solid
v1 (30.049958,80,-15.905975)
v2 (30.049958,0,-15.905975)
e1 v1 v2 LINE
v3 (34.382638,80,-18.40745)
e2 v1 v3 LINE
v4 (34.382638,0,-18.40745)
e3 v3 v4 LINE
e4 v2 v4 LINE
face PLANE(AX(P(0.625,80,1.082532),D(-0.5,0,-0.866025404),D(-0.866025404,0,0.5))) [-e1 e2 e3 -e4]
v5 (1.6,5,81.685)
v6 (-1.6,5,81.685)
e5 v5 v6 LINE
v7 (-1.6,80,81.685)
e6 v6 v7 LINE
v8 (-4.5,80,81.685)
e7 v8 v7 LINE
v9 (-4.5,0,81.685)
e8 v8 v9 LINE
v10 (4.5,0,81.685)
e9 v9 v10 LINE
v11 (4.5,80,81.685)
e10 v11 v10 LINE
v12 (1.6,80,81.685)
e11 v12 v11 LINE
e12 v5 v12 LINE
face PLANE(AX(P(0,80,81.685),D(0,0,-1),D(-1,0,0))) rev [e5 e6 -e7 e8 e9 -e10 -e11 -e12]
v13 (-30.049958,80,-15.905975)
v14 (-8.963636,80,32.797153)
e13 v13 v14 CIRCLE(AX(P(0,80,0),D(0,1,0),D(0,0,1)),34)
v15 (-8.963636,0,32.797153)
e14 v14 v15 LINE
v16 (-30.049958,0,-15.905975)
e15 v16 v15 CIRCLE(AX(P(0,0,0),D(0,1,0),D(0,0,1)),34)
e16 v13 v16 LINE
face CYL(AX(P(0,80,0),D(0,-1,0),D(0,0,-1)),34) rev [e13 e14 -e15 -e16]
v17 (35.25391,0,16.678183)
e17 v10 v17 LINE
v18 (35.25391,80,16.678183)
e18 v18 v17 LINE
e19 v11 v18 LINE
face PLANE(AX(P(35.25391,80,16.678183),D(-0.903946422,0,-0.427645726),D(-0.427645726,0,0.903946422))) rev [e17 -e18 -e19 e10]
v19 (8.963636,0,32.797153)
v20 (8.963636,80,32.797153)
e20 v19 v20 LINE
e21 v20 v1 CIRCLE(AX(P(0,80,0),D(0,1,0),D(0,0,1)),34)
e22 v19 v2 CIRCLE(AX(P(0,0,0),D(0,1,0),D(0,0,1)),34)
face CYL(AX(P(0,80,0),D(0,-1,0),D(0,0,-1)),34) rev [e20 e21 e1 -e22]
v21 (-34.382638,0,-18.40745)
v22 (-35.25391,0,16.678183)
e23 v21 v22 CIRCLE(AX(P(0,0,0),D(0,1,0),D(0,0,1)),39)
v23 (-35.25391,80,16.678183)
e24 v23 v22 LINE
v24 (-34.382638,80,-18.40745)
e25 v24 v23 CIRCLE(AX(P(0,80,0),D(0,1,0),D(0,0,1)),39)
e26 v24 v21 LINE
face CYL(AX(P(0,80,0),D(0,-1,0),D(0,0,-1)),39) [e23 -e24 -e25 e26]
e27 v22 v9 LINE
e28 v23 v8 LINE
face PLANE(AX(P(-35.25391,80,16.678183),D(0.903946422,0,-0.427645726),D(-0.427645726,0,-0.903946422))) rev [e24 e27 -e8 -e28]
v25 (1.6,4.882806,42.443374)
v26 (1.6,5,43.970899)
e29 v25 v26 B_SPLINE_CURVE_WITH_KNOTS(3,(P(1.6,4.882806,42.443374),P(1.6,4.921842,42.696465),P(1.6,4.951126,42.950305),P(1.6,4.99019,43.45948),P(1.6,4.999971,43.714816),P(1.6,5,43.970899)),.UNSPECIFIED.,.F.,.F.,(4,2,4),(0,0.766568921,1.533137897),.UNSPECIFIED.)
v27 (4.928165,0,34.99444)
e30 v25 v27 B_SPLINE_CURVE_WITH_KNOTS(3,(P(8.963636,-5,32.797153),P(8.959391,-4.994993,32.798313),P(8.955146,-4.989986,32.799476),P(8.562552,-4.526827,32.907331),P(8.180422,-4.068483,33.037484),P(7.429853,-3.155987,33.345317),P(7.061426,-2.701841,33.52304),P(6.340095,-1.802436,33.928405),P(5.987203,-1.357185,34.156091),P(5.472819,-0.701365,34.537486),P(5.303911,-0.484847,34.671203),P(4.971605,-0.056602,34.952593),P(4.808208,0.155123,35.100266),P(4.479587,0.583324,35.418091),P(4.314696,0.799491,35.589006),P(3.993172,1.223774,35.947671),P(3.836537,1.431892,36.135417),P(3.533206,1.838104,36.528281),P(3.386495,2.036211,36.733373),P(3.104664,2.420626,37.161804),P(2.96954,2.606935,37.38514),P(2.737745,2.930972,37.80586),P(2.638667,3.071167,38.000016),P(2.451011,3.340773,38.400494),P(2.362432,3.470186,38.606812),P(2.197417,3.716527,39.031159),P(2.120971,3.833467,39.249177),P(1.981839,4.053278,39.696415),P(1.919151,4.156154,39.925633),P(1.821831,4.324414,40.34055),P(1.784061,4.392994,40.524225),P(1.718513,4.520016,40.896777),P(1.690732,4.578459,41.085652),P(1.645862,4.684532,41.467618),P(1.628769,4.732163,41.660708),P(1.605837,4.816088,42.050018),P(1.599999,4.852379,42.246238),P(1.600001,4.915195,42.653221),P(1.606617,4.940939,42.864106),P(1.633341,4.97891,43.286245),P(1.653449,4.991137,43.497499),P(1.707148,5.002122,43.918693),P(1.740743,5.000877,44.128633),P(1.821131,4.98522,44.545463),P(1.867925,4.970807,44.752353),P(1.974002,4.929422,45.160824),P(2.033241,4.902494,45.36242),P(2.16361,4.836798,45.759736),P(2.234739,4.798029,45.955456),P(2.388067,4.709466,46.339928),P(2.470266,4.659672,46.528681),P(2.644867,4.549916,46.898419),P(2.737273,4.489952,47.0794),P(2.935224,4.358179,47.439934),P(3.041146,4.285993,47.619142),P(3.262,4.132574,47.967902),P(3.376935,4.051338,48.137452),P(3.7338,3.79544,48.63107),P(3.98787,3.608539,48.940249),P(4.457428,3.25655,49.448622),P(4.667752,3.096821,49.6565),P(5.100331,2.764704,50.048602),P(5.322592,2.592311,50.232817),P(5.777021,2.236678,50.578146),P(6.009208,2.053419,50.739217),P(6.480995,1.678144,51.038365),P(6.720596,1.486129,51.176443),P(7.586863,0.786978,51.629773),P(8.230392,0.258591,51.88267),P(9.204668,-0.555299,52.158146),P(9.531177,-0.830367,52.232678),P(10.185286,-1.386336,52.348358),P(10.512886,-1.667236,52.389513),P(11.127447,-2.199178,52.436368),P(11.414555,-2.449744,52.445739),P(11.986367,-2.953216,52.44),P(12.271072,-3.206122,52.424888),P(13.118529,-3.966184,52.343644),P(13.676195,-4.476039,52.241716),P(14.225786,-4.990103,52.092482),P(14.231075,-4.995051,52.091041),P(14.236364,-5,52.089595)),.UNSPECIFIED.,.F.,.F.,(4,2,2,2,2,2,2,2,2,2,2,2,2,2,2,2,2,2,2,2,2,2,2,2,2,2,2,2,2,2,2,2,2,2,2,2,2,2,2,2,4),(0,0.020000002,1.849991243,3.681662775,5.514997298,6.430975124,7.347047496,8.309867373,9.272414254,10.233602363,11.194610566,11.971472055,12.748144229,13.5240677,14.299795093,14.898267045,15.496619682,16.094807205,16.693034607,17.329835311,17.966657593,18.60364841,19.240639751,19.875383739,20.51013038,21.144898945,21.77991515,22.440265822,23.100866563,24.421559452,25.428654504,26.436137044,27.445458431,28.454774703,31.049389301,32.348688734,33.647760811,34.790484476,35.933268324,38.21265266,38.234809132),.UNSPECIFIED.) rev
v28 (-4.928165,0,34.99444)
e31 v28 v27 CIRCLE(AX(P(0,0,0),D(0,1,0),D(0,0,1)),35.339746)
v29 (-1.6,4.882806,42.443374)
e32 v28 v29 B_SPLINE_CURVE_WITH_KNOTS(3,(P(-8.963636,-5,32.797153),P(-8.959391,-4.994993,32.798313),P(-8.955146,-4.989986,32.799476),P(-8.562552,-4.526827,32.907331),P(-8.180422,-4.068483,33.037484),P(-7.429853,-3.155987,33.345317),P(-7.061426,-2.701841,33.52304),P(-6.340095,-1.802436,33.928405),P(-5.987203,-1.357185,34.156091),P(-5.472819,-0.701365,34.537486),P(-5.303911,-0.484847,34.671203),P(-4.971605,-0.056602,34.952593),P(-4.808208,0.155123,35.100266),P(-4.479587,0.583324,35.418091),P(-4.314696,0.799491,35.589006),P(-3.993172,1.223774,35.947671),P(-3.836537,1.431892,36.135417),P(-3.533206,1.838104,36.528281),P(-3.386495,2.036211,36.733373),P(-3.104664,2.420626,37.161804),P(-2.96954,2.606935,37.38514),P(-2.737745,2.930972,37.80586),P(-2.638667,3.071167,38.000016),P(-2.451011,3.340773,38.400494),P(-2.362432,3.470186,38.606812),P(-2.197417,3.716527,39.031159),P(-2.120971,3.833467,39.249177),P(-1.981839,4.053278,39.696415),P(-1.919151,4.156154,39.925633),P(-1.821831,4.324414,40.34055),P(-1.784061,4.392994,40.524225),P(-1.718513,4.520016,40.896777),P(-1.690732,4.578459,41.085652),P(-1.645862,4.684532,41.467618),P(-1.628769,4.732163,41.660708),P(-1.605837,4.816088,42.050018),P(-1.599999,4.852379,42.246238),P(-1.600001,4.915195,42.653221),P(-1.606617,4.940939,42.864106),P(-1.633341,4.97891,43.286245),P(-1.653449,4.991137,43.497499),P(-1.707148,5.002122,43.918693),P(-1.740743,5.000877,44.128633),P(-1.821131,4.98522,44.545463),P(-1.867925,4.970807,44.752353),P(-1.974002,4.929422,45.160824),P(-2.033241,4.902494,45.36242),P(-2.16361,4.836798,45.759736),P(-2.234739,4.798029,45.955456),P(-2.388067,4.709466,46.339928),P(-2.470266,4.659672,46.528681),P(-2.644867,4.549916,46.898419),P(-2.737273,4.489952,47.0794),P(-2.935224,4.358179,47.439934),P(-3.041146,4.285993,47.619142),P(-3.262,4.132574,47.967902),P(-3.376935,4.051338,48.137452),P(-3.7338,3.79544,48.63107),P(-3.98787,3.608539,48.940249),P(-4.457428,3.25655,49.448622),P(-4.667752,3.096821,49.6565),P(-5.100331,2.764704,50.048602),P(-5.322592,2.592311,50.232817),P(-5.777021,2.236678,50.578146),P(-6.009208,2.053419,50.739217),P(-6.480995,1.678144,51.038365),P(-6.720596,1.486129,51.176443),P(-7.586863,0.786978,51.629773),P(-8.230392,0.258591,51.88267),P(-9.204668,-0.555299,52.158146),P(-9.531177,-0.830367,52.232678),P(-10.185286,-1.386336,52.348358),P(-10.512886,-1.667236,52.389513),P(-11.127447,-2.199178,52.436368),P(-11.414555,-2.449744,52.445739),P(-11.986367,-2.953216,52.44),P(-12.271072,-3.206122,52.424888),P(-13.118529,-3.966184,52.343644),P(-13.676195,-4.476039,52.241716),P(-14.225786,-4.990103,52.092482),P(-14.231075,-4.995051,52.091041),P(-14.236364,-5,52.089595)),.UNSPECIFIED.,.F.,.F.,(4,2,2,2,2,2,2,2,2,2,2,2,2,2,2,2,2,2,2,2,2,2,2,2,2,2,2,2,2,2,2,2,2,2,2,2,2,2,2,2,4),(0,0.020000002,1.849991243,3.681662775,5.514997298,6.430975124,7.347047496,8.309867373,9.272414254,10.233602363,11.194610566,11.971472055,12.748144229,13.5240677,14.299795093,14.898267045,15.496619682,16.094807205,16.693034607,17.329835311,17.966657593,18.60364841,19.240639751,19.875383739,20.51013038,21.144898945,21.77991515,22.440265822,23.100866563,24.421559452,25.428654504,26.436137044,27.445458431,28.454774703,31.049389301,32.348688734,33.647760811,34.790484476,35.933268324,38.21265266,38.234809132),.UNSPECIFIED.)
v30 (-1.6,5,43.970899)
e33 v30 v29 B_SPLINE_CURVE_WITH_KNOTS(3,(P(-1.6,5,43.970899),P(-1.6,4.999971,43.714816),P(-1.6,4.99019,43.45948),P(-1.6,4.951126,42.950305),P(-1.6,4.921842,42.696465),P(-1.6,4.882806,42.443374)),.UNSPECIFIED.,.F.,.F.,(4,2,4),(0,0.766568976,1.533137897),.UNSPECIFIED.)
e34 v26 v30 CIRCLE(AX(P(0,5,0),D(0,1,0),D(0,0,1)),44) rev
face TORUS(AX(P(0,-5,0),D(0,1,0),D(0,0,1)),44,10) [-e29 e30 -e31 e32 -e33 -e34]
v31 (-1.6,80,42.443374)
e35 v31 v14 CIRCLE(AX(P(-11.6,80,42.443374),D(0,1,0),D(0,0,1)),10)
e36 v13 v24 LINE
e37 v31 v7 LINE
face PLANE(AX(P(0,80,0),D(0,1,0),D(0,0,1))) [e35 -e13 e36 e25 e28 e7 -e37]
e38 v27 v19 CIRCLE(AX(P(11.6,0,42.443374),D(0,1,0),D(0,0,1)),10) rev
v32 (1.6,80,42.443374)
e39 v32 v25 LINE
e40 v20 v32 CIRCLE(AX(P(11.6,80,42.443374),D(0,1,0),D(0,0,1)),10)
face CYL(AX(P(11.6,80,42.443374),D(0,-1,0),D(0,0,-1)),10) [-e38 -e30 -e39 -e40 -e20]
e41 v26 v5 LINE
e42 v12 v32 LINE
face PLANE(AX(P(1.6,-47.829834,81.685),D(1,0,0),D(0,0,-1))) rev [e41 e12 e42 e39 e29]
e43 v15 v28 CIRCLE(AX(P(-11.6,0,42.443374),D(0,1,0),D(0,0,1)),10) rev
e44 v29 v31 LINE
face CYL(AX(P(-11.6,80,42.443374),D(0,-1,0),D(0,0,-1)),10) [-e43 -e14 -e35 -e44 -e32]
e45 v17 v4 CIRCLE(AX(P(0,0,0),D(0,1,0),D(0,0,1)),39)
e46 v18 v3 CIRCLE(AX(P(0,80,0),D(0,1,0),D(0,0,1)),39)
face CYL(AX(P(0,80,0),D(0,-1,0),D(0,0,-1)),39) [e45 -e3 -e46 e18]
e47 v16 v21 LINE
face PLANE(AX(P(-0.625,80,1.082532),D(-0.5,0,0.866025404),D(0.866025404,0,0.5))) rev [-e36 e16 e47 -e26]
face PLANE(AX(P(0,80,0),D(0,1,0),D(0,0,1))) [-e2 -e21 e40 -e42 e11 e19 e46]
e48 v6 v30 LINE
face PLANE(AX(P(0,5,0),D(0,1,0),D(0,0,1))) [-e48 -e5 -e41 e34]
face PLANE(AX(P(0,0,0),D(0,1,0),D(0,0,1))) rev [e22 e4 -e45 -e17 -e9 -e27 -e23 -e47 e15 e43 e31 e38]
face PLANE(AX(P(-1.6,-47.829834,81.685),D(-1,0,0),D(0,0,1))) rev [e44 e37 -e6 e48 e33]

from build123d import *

# Parameters (mm, degrees)
FIN_SLOT_EXTRUDE_DEPTH = 80
FIN_START              = -75
FIN_SLOT_DEPTH         = 75
FILLET1_R              = 10


with BuildPart() as part:
    # Sketch2 → Fin slot extrude (new body)
    with BuildSketch(Plane(origin=(0, 0, 0), x_dir=(1, 0, 0), z_dir=(0, 1, 0))):
        with BuildLine():
            Line((-35.253910446, -16.678183302), (-4.5, -81.685))
            Line((-4.5, -81.685), (4.5, -81.685))
            Line((4.5, -81.685), (35.253910446, -16.678183302))
            ThreePointArc((35.253910446, -16.678183302), (38.987980591, 0.968178408), (34.382638025, 18.407449646))
            Line((34.382638025, 18.407449646), (30.049957519, 15.90597539))
            ThreePointArc((30.049957519, 15.90597539), (0, -34), (-30.049957519, 15.90597539))
            Line((-30.049957519, 15.90597539), (-34.382638025, 18.407449646))
            ThreePointArc((-34.382638025, 18.407449646), (-38.987980591, 0.968178408), (-35.253910446, -16.678183302))
        make_face()
    extrude(amount=FIN_SLOT_EXTRUDE_DEPTH)

    # Sketch3 → Fin slot (cut)
    with BuildSketch(Plane(origin=(0, 80, 0), x_dir=(1, 0, 0), z_dir=(0, 1, 0)).offset(FIN_START)):
        with BuildLine():
            Line((1.6, -81.685), (1.6, -33.962332075))
            ThreePointArc((1.6, -33.962332075), (0, -34), (-1.6, -33.962332075))
            Line((-1.6, -33.962332075), (-1.6, -81.685))
            Line((-1.6, -81.685), (1.6, -81.685))
        make_face()
    extrude(amount=FIN_SLOT_DEPTH, mode=Mode.SUBTRACT)

    # Fillet1
    # the kernel refuses this fillet: 10 mm, written as the material it takes off along each edge
    with BuildSketch(Plane(origin=(-1.6, 5, 33.962332075), x_dir=(0, 0, 1), z_dir=(0, 1, 0))) as fillet1_piece_1:
        with BuildLine():
            CenterArc((8.481041966, -10), FILLET1_R, 90, 74.714058958)
            Line((-1.165179407, -7.363636364), (-1.358103835, -7.310909091))
            ThreePointArc((-1.358103835, -7.310909091), (-0.577691759, -3.682593204), (-0.199778424, 0.009411765))
            Line((-0.199778424, 0.009411765), (0, 0.2))
            Line((0, 0.2), (8.481041966, 0.2))
            Line((8.481041966, 0.2), (8.481041966, 0))
        make_face()
    extrude(amount=75, mode=Mode.SUBTRACT)
    with BuildSketch(Plane(origin=(1.6, 5, 33.962332075), x_dir=(0, 0, 1), z_dir=(0, 1, 0))) as fillet1_piece_2:
        with BuildLine():
            CenterArc((8.481041966, 10), FILLET1_R, 195.285941042, 74.714058958)
            Line((-1.165179407, 7.363636364), (-1.358103835, 7.310909091))
            ThreePointArc((-1.358103835, 7.310909091), (-0.577691759, 3.682593204), (-0.199778424, -0.009411765))
            Line((-0.199778424, -0.009411765), (0, -0.2))
            Line((0, -0.2), (8.481041966, -0.2))
            Line((8.481041966, -0.2), (8.481041966, 0))
        make_face()
    extrude(amount=75, mode=Mode.SUBTRACT)
    with BuildSketch(Plane(origin=(0, 5, 0), x_dir=(0.7049632922211216, 0, 0.7092437920918008), z_dir=(0.7092437920918008, 0, -0.7049632922211216))) as fillet1_piece_3_section:
        with BuildLine():
            CenterArc((34 + FILLET1_R, FILLET1_R), FILLET1_R, 180, 90)
            Line((34, FILLET1_R), (34 - FILLET1_R * 0.02, FILLET1_R))
            Line((34 - FILLET1_R * 0.02, FILLET1_R), (34 - FILLET1_R * 0.02, -FILLET1_R * 0.02))
            Line((34 - FILLET1_R * 0.02, -FILLET1_R * 0.02), (34 + FILLET1_R, -FILLET1_R * 0.02))
            Line((34 + FILLET1_R, -FILLET1_R * 0.02), (34 + FILLET1_R, 0))
        make_face()
    fillet1_piece_3 = revolve(axis=Axis((0, 5, 0), (0, -1, 0)), revolution_arc=89.653157122, mode=Mode.PRIVATE)
    fillet1_piece_3 = split(fillet1_piece_3, bisect_by=Plane(origin=(1.6, 2.736001805, 36.252063161), z_dir=(-1, 0, 0)), keep=Keep.TOP, mode=Mode.PRIVATE)
    fillet1_piece_3 = split(fillet1_piece_3, bisect_by=Plane(origin=(-1.6, 2.736001805, 36.252063161), z_dir=(1, 0, 0)), keep=Keep.TOP, mode=Mode.PRIVATE)
    add(fillet1_piece_3, mode=Mode.SUBTRACT)
    with BuildSketch(Plane(origin=(0, 5, 0), x_dir=(0.7049632922211216, 0, 0.7092437920918008), z_dir=(0.7092437920918008, 0, -0.7049632922211216))) as fillet1_piece_4a_section:
        with BuildLine():
            CenterArc((34 + FILLET1_R, FILLET1_R), FILLET1_R, 180, 90)
            Line((34, FILLET1_R), (34 - FILLET1_R * 0.02, FILLET1_R))
            Line((34 - FILLET1_R * 0.02, FILLET1_R), (34 - FILLET1_R * 0.02, -FILLET1_R * 0.02))
            Line((34 - FILLET1_R * 0.02, -FILLET1_R * 0.02), (34 + FILLET1_R, -FILLET1_R * 0.02))
            Line((34 + FILLET1_R, -FILLET1_R * 0.02), (34 + FILLET1_R, 0))
        make_face()
    fillet1_piece_4a = revolve(axis=Axis((0, 5, 0), (0, -1, 0)), revolution_arc=89.653157122, mode=Mode.PRIVATE)
    fillet1_piece_4a = split(fillet1_piece_4a, bisect_by=Plane(origin=(-1.6, 2.81629174, 32.584573329), z_dir=(-1, 0, 0)), keep=Keep.TOP, mode=Mode.PRIVATE)
    with BuildSketch(Plane(origin=(-1.6, -16.202604914, 33.962332075), x_dir=(0, 0, 1), z_dir=(0, 1, 0))) as fillet1_piece_4b_section:
        with BuildLine():
            CenterArc((8.481041966, -10), FILLET1_R, 90, 74.714058958)
            Line((-1.165179407, -7.363636364), (-1.358103835, -7.310909091))
            ThreePointArc((-1.358103835, -7.310909091), (-0.577691759, -3.682593204), (-0.199778424, 0.009411765))
            Line((-0.199778424, 0.009411765), (0, 0.2))
            Line((0, 0.2), (8.481041966, 0.2))
            Line((8.481041966, 0.2), (8.481041966, 0))
        make_face()
    fillet1_piece_4b = extrude(amount=96.202604914, mode=Mode.PRIVATE)
    fillet1_piece_4b = split(fillet1_piece_4b, bisect_by=Plane(origin=(-3.235617235, 5, 35.755925785), z_dir=(0, -1, 0)), keep=Keep.TOP, mode=Mode.PRIVATE)
    fillet1_piece_4 = fillet1_piece_4a & fillet1_piece_4b
    add(fillet1_piece_4, mode=Mode.SUBTRACT)
    with BuildSketch(Plane(origin=(1.6, -16.202604914, 33.962332075), x_dir=(0, 0, 1), z_dir=(0, 1, 0))) as fillet1_piece_5a_section:
        with BuildLine():
            CenterArc((8.481041966, 10), FILLET1_R, 195.285941042, 74.714058958)
            Line((-1.165179407, 7.363636364), (-1.358103835, 7.310909091))
            ThreePointArc((-1.358103835, 7.310909091), (-0.577691759, 3.682593204), (-0.199778424, -0.009411765))
            Line((-0.199778424, -0.009411765), (0, -0.2))
            Line((0, -0.2), (8.481041966, -0.2))
            Line((8.481041966, -0.2), (8.481041966, 0))
        make_face()
    fillet1_piece_5a = extrude(amount=96.202604914, mode=Mode.PRIVATE)
    fillet1_piece_5a = split(fillet1_piece_5a, bisect_by=Plane(origin=(3.235617235, 5, 35.755925785), z_dir=(0, -1, 0)), keep=Keep.TOP, mode=Mode.PRIVATE)
    with BuildSketch(Plane(origin=(0, 5, 0), x_dir=(0.7049632922211216, 0, 0.7092437920918008), z_dir=(0.7092437920918008, 0, -0.7049632922211216))) as fillet1_piece_5b_section:
        with BuildLine():
            CenterArc((34 + FILLET1_R, FILLET1_R), FILLET1_R, 180, 90)
            Line((34, FILLET1_R), (34 - FILLET1_R * 0.02, FILLET1_R))
            Line((34 - FILLET1_R * 0.02, FILLET1_R), (34 - FILLET1_R * 0.02, -FILLET1_R * 0.02))
            Line((34 - FILLET1_R * 0.02, -FILLET1_R * 0.02), (34 + FILLET1_R, -FILLET1_R * 0.02))
            Line((34 + FILLET1_R, -FILLET1_R * 0.02), (34 + FILLET1_R, 0))
        make_face()
    fillet1_piece_5b = revolve(axis=Axis((0, 5, 0), (0, -1, 0)), revolution_arc=89.653157122, mode=Mode.PRIVATE)
    fillet1_piece_5b = split(fillet1_piece_5b, bisect_by=Plane(origin=(1.6, 2.816291902, 32.584573464), z_dir=(1, 0, 0)), keep=Keep.TOP, mode=Mode.PRIVATE)
    fillet1_piece_5 = fillet1_piece_5a & fillet1_piece_5b
    add(fillet1_piece_5, mode=Mode.SUBTRACT)


solid = part.part
